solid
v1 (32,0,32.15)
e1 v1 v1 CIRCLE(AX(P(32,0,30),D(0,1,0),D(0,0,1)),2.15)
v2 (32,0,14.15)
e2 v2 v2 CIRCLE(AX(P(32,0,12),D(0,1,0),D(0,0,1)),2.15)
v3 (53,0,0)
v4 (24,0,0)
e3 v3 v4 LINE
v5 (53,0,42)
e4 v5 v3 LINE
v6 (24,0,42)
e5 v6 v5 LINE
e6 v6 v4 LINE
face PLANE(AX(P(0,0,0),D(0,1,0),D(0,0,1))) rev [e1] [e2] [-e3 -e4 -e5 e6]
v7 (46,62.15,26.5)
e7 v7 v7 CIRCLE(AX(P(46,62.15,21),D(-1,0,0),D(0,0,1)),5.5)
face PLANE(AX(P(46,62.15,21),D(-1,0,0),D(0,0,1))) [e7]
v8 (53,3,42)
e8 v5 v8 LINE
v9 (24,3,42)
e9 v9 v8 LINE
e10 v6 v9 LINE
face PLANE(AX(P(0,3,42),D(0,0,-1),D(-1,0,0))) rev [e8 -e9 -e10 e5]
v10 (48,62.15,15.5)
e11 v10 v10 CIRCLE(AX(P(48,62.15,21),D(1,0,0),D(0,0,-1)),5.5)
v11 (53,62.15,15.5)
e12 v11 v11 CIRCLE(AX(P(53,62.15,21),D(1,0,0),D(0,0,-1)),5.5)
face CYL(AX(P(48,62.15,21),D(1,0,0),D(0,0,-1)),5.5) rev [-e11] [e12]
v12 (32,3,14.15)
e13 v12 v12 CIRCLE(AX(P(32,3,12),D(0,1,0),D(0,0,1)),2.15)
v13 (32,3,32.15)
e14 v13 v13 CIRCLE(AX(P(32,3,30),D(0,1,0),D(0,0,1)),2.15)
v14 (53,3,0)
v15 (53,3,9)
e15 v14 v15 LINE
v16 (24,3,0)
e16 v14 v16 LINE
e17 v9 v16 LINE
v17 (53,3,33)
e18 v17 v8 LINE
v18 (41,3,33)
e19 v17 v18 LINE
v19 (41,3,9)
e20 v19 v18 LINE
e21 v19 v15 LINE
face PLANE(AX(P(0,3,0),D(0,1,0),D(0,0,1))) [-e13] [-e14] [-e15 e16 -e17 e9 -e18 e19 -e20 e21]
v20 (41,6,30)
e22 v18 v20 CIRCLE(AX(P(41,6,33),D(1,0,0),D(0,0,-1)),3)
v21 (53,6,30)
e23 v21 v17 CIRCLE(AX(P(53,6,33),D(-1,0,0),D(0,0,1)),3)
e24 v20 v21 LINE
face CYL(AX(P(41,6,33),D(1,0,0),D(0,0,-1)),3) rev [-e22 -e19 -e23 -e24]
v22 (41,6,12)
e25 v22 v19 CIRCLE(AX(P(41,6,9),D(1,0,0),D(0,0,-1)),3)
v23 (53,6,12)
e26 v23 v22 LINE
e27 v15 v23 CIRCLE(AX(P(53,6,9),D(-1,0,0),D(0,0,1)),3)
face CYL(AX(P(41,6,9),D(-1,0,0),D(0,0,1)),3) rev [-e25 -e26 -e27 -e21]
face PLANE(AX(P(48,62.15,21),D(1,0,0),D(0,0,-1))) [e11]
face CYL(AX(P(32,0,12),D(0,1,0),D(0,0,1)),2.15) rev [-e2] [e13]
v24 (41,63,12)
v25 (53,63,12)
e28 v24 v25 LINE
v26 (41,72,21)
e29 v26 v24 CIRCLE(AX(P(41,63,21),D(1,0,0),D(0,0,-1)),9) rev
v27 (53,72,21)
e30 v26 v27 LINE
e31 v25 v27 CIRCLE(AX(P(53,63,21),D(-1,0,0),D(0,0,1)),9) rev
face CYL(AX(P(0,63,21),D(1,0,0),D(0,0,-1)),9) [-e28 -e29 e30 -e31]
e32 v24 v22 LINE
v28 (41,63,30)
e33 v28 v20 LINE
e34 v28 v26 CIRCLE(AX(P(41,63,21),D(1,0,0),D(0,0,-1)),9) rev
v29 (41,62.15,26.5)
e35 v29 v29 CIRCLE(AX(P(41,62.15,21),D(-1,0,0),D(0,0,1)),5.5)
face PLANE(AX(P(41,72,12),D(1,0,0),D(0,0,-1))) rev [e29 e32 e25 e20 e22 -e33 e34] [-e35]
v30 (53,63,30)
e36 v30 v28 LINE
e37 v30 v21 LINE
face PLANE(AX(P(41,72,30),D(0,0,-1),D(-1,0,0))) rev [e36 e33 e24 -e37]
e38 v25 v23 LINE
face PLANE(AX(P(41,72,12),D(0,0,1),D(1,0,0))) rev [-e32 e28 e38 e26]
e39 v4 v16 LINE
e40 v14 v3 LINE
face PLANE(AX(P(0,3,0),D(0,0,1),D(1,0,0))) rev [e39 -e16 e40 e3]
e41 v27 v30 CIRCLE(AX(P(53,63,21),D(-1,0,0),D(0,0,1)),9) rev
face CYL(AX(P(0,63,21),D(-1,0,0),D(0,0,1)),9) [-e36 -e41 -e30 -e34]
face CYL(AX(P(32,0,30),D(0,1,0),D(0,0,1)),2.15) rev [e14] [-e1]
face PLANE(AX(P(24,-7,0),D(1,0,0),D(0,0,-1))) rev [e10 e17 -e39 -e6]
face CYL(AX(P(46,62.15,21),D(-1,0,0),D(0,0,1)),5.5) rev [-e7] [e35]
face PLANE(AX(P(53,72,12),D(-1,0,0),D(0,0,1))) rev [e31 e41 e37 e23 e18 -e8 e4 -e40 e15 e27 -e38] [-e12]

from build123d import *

# Parameters (mm, degrees)
SKETCH1_W            = 94
SKETCH1_H            = 42
BOSS_EXTRUDE1_DEPTH  = 3
SKETCH2_W            = 4
SKETCH2_H            = 42
BOSS_EXTRUDE2_DEPTH  = 47
SKETCH3_R            = 12.5
SKETCH3_R_2          = 1.6
CUT_EXTRUDE1_DEPTH   = 114.176852757
SKETCH4_W            = 42
SKETCH4_H            = 5
BOSS_EXTRUDE3_DEPTH  = 40
SKETCH5_W            = 42
SKETCH5_H            = 5
BOSS_EXTRUDE4_DEPTH  = 38
SKETCH7_W            = 42
SKETCH7_H            = 42
SKETCH7_W_2          = 44
BOSS_EXTRUDE6_DEPTH  = 5
SKETCH9_R            = 2.15
CUT_EXTRUDE2_DEPTH   = 149.731301346
SKETCH11_W           = 10
SKETCH11_H           = 18
BOSS_EXTRUDE7_DEPTH  = 20
SKETCH13_R           = 5.5
CUT_EXTRUDE3_DEPTH   = 169.988165266
BOSS_EXTRUDE11_DEPTH = 5
SKETCH23_W           = 10
SKETCH23_H           = 26
BOSS_EXTRUDE12_DEPTH = 50
CUT_EXTRUDE7_DEPTH   = 193.595430891
SKETCH25_W           = 10
SKETCH25_H           = 18
BOSS_EXTRUDE13_DEPTH = 20
SKETCH26_R           = 5.5
CUT_EXTRUDE8_DEPTH   = 193.595430891
SKETCH27_W           = 12
SKETCH27_H           = 18
BOSS_EXTRUDE14_DEPTH = 69
CUT_EXTRUDE10_START  = -5
SKETCH28_R           = 5.5
CUT_EXTRUDE10_DEPTH  = 5
SKETCH29_R           = 5.5
CUT_EXTRUDE11_DEPTH  = 5
FILLET4_R            = 9
FILLET3_R            = 3
SKETCH30_W           = 60
SKETCH30_H           = 42
SKETCH30_W_2         = 81
SKETCH30_H_2         = 100
CUT_EXTRUDE12_DEPTH  = 181.413414135
SKETCH31_W           = 2
SKETCH31_H           = 42
CUT_EXTRUDE13_DEPTH  = 10


# Some blends are built 0.0001 mm under size
with BuildPart() as part:
    # Sketch1 → Boss-Extrude1 (new body)
    with BuildSketch(Plane(origin=(0, 0, 0), x_dir=(1, 0, 0), z_dir=(0, 1, 0))):
        with Locations((47, -21)):
            Rectangle(SKETCH1_W, SKETCH1_H)
    extrude(amount=BOSS_EXTRUDE1_DEPTH)

    # Sketch2 → Boss-Extrude2 (add)
    with BuildSketch(Plane.XZ):
        with Locations((2, 21)):
            Rectangle(SKETCH2_W, SKETCH2_H)
        with Locations((92, 21)):
            Rectangle(SKETCH2_W, SKETCH2_H)
    extrude(amount=-BOSS_EXTRUDE2_DEPTH)

    # Sketch3 → Cut-Extrude1 (cut, through all)
    with BuildSketch(Plane(origin=(94, 0, 0), x_dir=(0, 0, -1), z_dir=(1, 0, 0))):
        with Locations((-21, 26)):
            Circle(SKETCH3_R)
        with Locations((-36.5, 41.5)):
            Circle(SKETCH3_R_2)
        with Locations((-5.5, 41.5)):
            Circle(SKETCH3_R_2)
        with Locations((-36.5, 10.5)):
            Circle(SKETCH3_R_2)
        with Locations((-5.5, 10.5)):
            Circle(SKETCH3_R_2)
    extrude(amount=-CUT_EXTRUDE1_DEPTH, mode=Mode.SUBTRACT)

    # Sketch4 → Boss-Extrude3 (add)
    with BuildSketch(Plane(origin=(94, 0, 0), x_dir=(0, 0, -1), z_dir=(1, 0, 0))):
        with Locations((-21, 2.5)):
            Rectangle(SKETCH4_W, SKETCH4_H)
    extrude(amount=BOSS_EXTRUDE3_DEPTH)

    # Sketch5 → Boss-Extrude4 (add)
    with BuildSketch(Plane.ZY):
        with Locations((21, 2.5)):
            Rectangle(SKETCH5_W, SKETCH5_H)
    extrude(amount=BOSS_EXTRUDE4_DEPTH)

    # Sketch7 → Boss-Extrude6 (add)
    with BuildSketch(Plane(origin=(0, 47, 0), x_dir=(1, 0, 0), z_dir=(0, 1, 0))):
        with Locations((-17, -21)):
            Rectangle(SKETCH7_W, SKETCH7_H)
        with Locations((112, -21)):
            Rectangle(SKETCH7_W_2, SKETCH7_H)
    extrude(amount=BOSS_EXTRUDE6_DEPTH)

    # Sketch9 → Cut-Extrude2 (cut, through all)
    with BuildSketch(Plane(origin=(0, 3, 0), x_dir=(1, 0, 0), z_dir=(0, 1, 0))):
        with Locations(Location((83, -20, 0), (0, 0, 270))):
            Circle(SKETCH9_R)
        with Locations(Location((65, -20, 0), (0, 0, 270))):
            Circle(SKETCH9_R)
        with Locations(Location((74, -11, 0), (0, 0, 270))):
            Circle(SKETCH9_R)
        with Locations(Location((74, -29, 0), (0, 0, 270))):
            Circle(SKETCH9_R)
        with Locations(Location((16, -12, 0), (0, 0, 270))):
            Circle(SKETCH9_R)
        with Locations(Location((16, -30, 0), (0, 0, 270))):
            Circle(SKETCH9_R)
        with Locations(Location((32, -12, 0), (0, 0, 270))):
            Circle(SKETCH9_R)
        with Locations(Location((32, -30, 0), (0, 0, 270))):
            Circle(SKETCH9_R)
    extrude(amount=-CUT_EXTRUDE2_DEPTH, mode=Mode.SUBTRACT)

    # Sketch11 → Boss-Extrude7 (add)
    with BuildSketch(Plane(origin=(0, 52, 0), x_dir=(1, 0, 0), z_dir=(0, 1, 0))):
        with Locations((-8, -21)):
            Rectangle(SKETCH11_W, SKETCH11_H)
        with Locations((107, -21)):
            Rectangle(SKETCH11_W, SKETCH11_H)
    extrude(amount=BOSS_EXTRUDE7_DEPTH)

    # Sketch13 → Cut-Extrude3 (cut, through all)
    with BuildSketch(Plane.ZY.offset(13)):
        with Locations((21, 62.15)):
            Circle(SKETCH13_R)
    extrude(amount=-CUT_EXTRUDE3_DEPTH, mode=Mode.SUBTRACT)

    # Sketch20 → Boss-Extrude11 (add)
    with BuildSketch(Plane.XY.offset(42)):
        Polygon((134, 0), (134, 52), (90, 52), (90, 0), (95, 0), (95, 20), (102, 26), (112, 26), (129, 20), (129, 0), align=None)
    extrude(amount=BOSS_EXTRUDE11_DEPTH)

    # Sketch23 → Boss-Extrude12 (add)
    with BuildSketch(Plane.XY.offset(47)):
        with Locations((107, 39)):
            Rectangle(SKETCH23_W, SKETCH23_H)
    extrude(amount=BOSS_EXTRUDE12_DEPTH)

    # Sketch24 → Cut-Extrude7 (cut, through all)
    with BuildSketch(Plane(origin=(112, 0, 0), x_dir=(0, 0, -1), z_dir=(1, 0, 0))):
        Polygon((-47, 26), (-97, 39), (-97, 26), align=None)
    extrude(amount=-CUT_EXTRUDE7_DEPTH, mode=Mode.SUBTRACT)

    # Sketch25 → Boss-Extrude13 (add)
    with BuildSketch(Plane(origin=(0, 52, 0), x_dir=(1, 0, 0), z_dir=(0, 1, 0))):
        with Locations((107, -71)):
            Rectangle(SKETCH25_W, SKETCH25_H)
    extrude(amount=BOSS_EXTRUDE13_DEPTH)

    # Sketch26 → Cut-Extrude8 (cut, through all)
    with BuildSketch(Plane(origin=(112, 0, 0), x_dir=(0, 0, -1), z_dir=(1, 0, 0))):
        with Locations((-71, 62.15)):
            Circle(SKETCH26_R)
    extrude(amount=-CUT_EXTRUDE8_DEPTH, mode=Mode.SUBTRACT)

    # Sketch27 → Boss-Extrude14 (add)
    with BuildSketch(Plane(origin=(0, 3, 0), x_dir=(1, 0, 0), z_dir=(0, 1, 0))):
        with Locations((47, -21)):
            Rectangle(SKETCH27_W, SKETCH27_H)
    extrude(amount=BOSS_EXTRUDE14_DEPTH)

    # Sketch28 → Cut-Extrude10 (cut)
    with BuildSketch(Plane(origin=(53, 0, 0), x_dir=(0, 0, -1), z_dir=(1, 0, 0)).offset(CUT_EXTRUDE10_START)):
        with Locations(Location((-21, 62.15, 0), (0, 0, 180))):
            Circle(SKETCH28_R)
    extrude(amount=CUT_EXTRUDE10_DEPTH, mode=Mode.SUBTRACT)

    # Sketch29 → Cut-Extrude11 (cut)
    with BuildSketch(Plane.ZY.offset(-41)):
        with Locations((21, 62.15)):
            Circle(SKETCH29_R)
    extrude(amount=-CUT_EXTRUDE11_DEPTH, mode=Mode.SUBTRACT)

    # Fillet4
    fillet4_edges = [part.edges().sort_by_distance(p)[0] for p in [
        (-8, 72, 12),
        (-8, 72, 30),
        (107, 72, 12),
        (107, 72, 30),
        (107, 72, 62),
        (107, 72, 80),
        (47, 72, 12),
        (47, 72, 30),
    ]]
    fillet(fillet4_edges, radius=FILLET4_R - 0.0001)  # a hair under: the kernel refuses the full size

    # Fillet3
    # the kernel refuses this fillet: 3 mm, written as the material it adds along each edge
    with BuildSketch(Plane(origin=(-3, 52, 30), x_dir=(0, 1, 0), z_dir=(-1, 0, 0)), Plane(origin=(112, 52, 80), x_dir=(0, 1, 0), z_dir=(-1, 0, 0))) as fillet3_piece_1:
        with BuildLine():
            CenterArc((FILLET3_R, -FILLET3_R), FILLET3_R, 90, 90)
            Line((0, -FILLET3_R), (0, 0))
            Line((0, 0), (FILLET3_R, 0))
        make_face()
    extrude(amount=10)
    with BuildSketch(Plane(origin=(-13, 52, 12), x_dir=(0, 0, -1), z_dir=(1, 0, 0)), Plane(origin=(112, 52, 30), x_dir=(0, 0, 1), z_dir=(-1, 0, 0)), Plane(origin=(102, 52, 12), x_dir=(0, 0, -1), z_dir=(1, 0, 0)), Plane(origin=(102, 52, 62), x_dir=(0, 0, -1), z_dir=(1, 0, 0))) as fillet3_piece_2:
        with BuildLine():
            CenterArc((FILLET3_R, FILLET3_R), FILLET3_R, 180, 90)
            Line((0, FILLET3_R), (0, 0))
            Line((0, 0), (FILLET3_R, 0))
        make_face()
    extrude(amount=10)
    with BuildSketch(Plane(origin=(95, 20, 42), x_dir=(0, -1, 0), z_dir=(0, 0, 1))) as fillet3_piece_3:
        with BuildLine():
            CenterArc((FILLET3_R * 0.45993492247, FILLET3_R), FILLET3_R, 220.601294645, 49.398705355)
            Line((-FILLET3_R * 0.299321679895, FILLET3_R * 0.349208626544), (0, 0))
            Line((0, 0), (FILLET3_R * 0.45993492247, 0))
        make_face()
    extrude(amount=5)
    with BuildSketch(Plane(origin=(102, 26, 42), x_dir=(-0.7592566023652966, -0.6507913734559685, 0), z_dir=(0, 0, 1))) as fillet3_piece_4:
        with BuildLine():
            CenterArc((FILLET3_R * 0.369924076215, FILLET3_R), FILLET3_R, 229.398705355, 40.601294645)
            Line((-FILLET3_R * 0.28086729724, FILLET3_R * 0.240743397635), (0, 0))
            Line((0, 0), (FILLET3_R * 0.369924076215, 0))
        make_face()
    extrude(amount=5)
    with BuildSketch(Plane(origin=(112, 26, 42), x_dir=(0.942990333582889, -0.3328201177351389, 0), z_dir=(0, 0, 1))) as fillet3_piece_5:
        with BuildLine():
            CenterArc((FILLET3_R * 0.171292729553, -FILLET3_R), FILLET3_R, 90, 19.440034828)
            Line((-FILLET3_R * 0.161527388182, -FILLET3_R * 0.0570096664171), (0, 0))
            Line((0, 0), (FILLET3_R * 0.171292729553, 0))
        make_face()
    extrude(amount=5)
    with BuildSketch(Plane(origin=(129, 20, 42), x_dir=(0, -1, 0), z_dir=(0, 0, 1))) as fillet3_piece_6:
        with BuildLine():
            CenterArc((FILLET3_R * 0.707515081019, -FILLET3_R), FILLET3_R, 90, 70.559965172)
            Line((-FILLET3_R * 0.235475252564, -FILLET3_R * 0.667179882265), (0, 0))
            Line((0, 0), (FILLET3_R * 0.707515081019, 0))
        make_face()
    extrude(amount=5)
    with BuildSketch(Plane(origin=(53, 3, 30), x_dir=(0, 0, 1), z_dir=(-1, 0, 0)), Plane(origin=(41, 3, 12), x_dir=(0, 0, -1), z_dir=(1, 0, 0))) as fillet3_piece_7:
        with BuildLine():
            CenterArc((FILLET3_R, FILLET3_R), FILLET3_R, 180, 90)
            Line((0, FILLET3_R), (0, 0))
            Line((0, 0), (FILLET3_R, 0))
        make_face()
    extrude(amount=12)
    # the kernel refuses this fillet: 3 mm, written as the material it takes off along each edge
    with BuildSketch(Plane(origin=(94.5, 52, 97), x_dir=(0, 0, -1), z_dir=(1, 0, 0))) as fillet3_2_piece_1:
        with BuildLine():
            CenterArc((FILLET3_R, -FILLET3_R), FILLET3_R, 90, 90)
            Line((0, -FILLET3_R), (0, 0))
            Line((0, 0), (FILLET3_R, 0))
        make_face()
    extrude(amount=25, mode=Mode.SUBTRACT)
    with BuildSketch(Plane(origin=(117.799354812, 39, 97), x_dir=(0, -0.25163385176495195, -0.9678225067882716), z_dir=(-1, 0, 0))) as fillet3_2_piece_2:
        with BuildLine():
            CenterArc((FILLET3_R * 0.773247308247, -FILLET3_R), FILLET3_R, 90, 75.425783802)
            Line((-FILLET3_R * 0.194575198541, -FILLET3_R * 0.748366148235), (0, 0))
            Line((0, 0), (FILLET3_R * 0.773247308247, 0))
        make_face()
    extrude(amount=21.598709624, mode=Mode.SUBTRACT)

    # Sketch30 → Cut-Extrude12 (cut, through all)
    with BuildSketch(Plane.XZ):
        with Locations((-8, 21)):
            Rectangle(SKETCH30_W, SKETCH30_H)
        with Locations((93.5, 50)):
            Rectangle(SKETCH30_W_2, SKETCH30_H_2)
    extrude(amount=-CUT_EXTRUDE12_DEPTH, mode=Mode.SUBTRACT)

    # Sketch31 → Cut-Extrude13 (cut)
    with BuildSketch(Plane(origin=(0, 3, 0), x_dir=(1, 0, 0), z_dir=(0, 1, 0))):
        with Locations((23, -21)):
            Rectangle(SKETCH31_W, SKETCH31_H)
    extrude(amount=-CUT_EXTRUDE13_DEPTH, mode=Mode.SUBTRACT)


solid = part.part
